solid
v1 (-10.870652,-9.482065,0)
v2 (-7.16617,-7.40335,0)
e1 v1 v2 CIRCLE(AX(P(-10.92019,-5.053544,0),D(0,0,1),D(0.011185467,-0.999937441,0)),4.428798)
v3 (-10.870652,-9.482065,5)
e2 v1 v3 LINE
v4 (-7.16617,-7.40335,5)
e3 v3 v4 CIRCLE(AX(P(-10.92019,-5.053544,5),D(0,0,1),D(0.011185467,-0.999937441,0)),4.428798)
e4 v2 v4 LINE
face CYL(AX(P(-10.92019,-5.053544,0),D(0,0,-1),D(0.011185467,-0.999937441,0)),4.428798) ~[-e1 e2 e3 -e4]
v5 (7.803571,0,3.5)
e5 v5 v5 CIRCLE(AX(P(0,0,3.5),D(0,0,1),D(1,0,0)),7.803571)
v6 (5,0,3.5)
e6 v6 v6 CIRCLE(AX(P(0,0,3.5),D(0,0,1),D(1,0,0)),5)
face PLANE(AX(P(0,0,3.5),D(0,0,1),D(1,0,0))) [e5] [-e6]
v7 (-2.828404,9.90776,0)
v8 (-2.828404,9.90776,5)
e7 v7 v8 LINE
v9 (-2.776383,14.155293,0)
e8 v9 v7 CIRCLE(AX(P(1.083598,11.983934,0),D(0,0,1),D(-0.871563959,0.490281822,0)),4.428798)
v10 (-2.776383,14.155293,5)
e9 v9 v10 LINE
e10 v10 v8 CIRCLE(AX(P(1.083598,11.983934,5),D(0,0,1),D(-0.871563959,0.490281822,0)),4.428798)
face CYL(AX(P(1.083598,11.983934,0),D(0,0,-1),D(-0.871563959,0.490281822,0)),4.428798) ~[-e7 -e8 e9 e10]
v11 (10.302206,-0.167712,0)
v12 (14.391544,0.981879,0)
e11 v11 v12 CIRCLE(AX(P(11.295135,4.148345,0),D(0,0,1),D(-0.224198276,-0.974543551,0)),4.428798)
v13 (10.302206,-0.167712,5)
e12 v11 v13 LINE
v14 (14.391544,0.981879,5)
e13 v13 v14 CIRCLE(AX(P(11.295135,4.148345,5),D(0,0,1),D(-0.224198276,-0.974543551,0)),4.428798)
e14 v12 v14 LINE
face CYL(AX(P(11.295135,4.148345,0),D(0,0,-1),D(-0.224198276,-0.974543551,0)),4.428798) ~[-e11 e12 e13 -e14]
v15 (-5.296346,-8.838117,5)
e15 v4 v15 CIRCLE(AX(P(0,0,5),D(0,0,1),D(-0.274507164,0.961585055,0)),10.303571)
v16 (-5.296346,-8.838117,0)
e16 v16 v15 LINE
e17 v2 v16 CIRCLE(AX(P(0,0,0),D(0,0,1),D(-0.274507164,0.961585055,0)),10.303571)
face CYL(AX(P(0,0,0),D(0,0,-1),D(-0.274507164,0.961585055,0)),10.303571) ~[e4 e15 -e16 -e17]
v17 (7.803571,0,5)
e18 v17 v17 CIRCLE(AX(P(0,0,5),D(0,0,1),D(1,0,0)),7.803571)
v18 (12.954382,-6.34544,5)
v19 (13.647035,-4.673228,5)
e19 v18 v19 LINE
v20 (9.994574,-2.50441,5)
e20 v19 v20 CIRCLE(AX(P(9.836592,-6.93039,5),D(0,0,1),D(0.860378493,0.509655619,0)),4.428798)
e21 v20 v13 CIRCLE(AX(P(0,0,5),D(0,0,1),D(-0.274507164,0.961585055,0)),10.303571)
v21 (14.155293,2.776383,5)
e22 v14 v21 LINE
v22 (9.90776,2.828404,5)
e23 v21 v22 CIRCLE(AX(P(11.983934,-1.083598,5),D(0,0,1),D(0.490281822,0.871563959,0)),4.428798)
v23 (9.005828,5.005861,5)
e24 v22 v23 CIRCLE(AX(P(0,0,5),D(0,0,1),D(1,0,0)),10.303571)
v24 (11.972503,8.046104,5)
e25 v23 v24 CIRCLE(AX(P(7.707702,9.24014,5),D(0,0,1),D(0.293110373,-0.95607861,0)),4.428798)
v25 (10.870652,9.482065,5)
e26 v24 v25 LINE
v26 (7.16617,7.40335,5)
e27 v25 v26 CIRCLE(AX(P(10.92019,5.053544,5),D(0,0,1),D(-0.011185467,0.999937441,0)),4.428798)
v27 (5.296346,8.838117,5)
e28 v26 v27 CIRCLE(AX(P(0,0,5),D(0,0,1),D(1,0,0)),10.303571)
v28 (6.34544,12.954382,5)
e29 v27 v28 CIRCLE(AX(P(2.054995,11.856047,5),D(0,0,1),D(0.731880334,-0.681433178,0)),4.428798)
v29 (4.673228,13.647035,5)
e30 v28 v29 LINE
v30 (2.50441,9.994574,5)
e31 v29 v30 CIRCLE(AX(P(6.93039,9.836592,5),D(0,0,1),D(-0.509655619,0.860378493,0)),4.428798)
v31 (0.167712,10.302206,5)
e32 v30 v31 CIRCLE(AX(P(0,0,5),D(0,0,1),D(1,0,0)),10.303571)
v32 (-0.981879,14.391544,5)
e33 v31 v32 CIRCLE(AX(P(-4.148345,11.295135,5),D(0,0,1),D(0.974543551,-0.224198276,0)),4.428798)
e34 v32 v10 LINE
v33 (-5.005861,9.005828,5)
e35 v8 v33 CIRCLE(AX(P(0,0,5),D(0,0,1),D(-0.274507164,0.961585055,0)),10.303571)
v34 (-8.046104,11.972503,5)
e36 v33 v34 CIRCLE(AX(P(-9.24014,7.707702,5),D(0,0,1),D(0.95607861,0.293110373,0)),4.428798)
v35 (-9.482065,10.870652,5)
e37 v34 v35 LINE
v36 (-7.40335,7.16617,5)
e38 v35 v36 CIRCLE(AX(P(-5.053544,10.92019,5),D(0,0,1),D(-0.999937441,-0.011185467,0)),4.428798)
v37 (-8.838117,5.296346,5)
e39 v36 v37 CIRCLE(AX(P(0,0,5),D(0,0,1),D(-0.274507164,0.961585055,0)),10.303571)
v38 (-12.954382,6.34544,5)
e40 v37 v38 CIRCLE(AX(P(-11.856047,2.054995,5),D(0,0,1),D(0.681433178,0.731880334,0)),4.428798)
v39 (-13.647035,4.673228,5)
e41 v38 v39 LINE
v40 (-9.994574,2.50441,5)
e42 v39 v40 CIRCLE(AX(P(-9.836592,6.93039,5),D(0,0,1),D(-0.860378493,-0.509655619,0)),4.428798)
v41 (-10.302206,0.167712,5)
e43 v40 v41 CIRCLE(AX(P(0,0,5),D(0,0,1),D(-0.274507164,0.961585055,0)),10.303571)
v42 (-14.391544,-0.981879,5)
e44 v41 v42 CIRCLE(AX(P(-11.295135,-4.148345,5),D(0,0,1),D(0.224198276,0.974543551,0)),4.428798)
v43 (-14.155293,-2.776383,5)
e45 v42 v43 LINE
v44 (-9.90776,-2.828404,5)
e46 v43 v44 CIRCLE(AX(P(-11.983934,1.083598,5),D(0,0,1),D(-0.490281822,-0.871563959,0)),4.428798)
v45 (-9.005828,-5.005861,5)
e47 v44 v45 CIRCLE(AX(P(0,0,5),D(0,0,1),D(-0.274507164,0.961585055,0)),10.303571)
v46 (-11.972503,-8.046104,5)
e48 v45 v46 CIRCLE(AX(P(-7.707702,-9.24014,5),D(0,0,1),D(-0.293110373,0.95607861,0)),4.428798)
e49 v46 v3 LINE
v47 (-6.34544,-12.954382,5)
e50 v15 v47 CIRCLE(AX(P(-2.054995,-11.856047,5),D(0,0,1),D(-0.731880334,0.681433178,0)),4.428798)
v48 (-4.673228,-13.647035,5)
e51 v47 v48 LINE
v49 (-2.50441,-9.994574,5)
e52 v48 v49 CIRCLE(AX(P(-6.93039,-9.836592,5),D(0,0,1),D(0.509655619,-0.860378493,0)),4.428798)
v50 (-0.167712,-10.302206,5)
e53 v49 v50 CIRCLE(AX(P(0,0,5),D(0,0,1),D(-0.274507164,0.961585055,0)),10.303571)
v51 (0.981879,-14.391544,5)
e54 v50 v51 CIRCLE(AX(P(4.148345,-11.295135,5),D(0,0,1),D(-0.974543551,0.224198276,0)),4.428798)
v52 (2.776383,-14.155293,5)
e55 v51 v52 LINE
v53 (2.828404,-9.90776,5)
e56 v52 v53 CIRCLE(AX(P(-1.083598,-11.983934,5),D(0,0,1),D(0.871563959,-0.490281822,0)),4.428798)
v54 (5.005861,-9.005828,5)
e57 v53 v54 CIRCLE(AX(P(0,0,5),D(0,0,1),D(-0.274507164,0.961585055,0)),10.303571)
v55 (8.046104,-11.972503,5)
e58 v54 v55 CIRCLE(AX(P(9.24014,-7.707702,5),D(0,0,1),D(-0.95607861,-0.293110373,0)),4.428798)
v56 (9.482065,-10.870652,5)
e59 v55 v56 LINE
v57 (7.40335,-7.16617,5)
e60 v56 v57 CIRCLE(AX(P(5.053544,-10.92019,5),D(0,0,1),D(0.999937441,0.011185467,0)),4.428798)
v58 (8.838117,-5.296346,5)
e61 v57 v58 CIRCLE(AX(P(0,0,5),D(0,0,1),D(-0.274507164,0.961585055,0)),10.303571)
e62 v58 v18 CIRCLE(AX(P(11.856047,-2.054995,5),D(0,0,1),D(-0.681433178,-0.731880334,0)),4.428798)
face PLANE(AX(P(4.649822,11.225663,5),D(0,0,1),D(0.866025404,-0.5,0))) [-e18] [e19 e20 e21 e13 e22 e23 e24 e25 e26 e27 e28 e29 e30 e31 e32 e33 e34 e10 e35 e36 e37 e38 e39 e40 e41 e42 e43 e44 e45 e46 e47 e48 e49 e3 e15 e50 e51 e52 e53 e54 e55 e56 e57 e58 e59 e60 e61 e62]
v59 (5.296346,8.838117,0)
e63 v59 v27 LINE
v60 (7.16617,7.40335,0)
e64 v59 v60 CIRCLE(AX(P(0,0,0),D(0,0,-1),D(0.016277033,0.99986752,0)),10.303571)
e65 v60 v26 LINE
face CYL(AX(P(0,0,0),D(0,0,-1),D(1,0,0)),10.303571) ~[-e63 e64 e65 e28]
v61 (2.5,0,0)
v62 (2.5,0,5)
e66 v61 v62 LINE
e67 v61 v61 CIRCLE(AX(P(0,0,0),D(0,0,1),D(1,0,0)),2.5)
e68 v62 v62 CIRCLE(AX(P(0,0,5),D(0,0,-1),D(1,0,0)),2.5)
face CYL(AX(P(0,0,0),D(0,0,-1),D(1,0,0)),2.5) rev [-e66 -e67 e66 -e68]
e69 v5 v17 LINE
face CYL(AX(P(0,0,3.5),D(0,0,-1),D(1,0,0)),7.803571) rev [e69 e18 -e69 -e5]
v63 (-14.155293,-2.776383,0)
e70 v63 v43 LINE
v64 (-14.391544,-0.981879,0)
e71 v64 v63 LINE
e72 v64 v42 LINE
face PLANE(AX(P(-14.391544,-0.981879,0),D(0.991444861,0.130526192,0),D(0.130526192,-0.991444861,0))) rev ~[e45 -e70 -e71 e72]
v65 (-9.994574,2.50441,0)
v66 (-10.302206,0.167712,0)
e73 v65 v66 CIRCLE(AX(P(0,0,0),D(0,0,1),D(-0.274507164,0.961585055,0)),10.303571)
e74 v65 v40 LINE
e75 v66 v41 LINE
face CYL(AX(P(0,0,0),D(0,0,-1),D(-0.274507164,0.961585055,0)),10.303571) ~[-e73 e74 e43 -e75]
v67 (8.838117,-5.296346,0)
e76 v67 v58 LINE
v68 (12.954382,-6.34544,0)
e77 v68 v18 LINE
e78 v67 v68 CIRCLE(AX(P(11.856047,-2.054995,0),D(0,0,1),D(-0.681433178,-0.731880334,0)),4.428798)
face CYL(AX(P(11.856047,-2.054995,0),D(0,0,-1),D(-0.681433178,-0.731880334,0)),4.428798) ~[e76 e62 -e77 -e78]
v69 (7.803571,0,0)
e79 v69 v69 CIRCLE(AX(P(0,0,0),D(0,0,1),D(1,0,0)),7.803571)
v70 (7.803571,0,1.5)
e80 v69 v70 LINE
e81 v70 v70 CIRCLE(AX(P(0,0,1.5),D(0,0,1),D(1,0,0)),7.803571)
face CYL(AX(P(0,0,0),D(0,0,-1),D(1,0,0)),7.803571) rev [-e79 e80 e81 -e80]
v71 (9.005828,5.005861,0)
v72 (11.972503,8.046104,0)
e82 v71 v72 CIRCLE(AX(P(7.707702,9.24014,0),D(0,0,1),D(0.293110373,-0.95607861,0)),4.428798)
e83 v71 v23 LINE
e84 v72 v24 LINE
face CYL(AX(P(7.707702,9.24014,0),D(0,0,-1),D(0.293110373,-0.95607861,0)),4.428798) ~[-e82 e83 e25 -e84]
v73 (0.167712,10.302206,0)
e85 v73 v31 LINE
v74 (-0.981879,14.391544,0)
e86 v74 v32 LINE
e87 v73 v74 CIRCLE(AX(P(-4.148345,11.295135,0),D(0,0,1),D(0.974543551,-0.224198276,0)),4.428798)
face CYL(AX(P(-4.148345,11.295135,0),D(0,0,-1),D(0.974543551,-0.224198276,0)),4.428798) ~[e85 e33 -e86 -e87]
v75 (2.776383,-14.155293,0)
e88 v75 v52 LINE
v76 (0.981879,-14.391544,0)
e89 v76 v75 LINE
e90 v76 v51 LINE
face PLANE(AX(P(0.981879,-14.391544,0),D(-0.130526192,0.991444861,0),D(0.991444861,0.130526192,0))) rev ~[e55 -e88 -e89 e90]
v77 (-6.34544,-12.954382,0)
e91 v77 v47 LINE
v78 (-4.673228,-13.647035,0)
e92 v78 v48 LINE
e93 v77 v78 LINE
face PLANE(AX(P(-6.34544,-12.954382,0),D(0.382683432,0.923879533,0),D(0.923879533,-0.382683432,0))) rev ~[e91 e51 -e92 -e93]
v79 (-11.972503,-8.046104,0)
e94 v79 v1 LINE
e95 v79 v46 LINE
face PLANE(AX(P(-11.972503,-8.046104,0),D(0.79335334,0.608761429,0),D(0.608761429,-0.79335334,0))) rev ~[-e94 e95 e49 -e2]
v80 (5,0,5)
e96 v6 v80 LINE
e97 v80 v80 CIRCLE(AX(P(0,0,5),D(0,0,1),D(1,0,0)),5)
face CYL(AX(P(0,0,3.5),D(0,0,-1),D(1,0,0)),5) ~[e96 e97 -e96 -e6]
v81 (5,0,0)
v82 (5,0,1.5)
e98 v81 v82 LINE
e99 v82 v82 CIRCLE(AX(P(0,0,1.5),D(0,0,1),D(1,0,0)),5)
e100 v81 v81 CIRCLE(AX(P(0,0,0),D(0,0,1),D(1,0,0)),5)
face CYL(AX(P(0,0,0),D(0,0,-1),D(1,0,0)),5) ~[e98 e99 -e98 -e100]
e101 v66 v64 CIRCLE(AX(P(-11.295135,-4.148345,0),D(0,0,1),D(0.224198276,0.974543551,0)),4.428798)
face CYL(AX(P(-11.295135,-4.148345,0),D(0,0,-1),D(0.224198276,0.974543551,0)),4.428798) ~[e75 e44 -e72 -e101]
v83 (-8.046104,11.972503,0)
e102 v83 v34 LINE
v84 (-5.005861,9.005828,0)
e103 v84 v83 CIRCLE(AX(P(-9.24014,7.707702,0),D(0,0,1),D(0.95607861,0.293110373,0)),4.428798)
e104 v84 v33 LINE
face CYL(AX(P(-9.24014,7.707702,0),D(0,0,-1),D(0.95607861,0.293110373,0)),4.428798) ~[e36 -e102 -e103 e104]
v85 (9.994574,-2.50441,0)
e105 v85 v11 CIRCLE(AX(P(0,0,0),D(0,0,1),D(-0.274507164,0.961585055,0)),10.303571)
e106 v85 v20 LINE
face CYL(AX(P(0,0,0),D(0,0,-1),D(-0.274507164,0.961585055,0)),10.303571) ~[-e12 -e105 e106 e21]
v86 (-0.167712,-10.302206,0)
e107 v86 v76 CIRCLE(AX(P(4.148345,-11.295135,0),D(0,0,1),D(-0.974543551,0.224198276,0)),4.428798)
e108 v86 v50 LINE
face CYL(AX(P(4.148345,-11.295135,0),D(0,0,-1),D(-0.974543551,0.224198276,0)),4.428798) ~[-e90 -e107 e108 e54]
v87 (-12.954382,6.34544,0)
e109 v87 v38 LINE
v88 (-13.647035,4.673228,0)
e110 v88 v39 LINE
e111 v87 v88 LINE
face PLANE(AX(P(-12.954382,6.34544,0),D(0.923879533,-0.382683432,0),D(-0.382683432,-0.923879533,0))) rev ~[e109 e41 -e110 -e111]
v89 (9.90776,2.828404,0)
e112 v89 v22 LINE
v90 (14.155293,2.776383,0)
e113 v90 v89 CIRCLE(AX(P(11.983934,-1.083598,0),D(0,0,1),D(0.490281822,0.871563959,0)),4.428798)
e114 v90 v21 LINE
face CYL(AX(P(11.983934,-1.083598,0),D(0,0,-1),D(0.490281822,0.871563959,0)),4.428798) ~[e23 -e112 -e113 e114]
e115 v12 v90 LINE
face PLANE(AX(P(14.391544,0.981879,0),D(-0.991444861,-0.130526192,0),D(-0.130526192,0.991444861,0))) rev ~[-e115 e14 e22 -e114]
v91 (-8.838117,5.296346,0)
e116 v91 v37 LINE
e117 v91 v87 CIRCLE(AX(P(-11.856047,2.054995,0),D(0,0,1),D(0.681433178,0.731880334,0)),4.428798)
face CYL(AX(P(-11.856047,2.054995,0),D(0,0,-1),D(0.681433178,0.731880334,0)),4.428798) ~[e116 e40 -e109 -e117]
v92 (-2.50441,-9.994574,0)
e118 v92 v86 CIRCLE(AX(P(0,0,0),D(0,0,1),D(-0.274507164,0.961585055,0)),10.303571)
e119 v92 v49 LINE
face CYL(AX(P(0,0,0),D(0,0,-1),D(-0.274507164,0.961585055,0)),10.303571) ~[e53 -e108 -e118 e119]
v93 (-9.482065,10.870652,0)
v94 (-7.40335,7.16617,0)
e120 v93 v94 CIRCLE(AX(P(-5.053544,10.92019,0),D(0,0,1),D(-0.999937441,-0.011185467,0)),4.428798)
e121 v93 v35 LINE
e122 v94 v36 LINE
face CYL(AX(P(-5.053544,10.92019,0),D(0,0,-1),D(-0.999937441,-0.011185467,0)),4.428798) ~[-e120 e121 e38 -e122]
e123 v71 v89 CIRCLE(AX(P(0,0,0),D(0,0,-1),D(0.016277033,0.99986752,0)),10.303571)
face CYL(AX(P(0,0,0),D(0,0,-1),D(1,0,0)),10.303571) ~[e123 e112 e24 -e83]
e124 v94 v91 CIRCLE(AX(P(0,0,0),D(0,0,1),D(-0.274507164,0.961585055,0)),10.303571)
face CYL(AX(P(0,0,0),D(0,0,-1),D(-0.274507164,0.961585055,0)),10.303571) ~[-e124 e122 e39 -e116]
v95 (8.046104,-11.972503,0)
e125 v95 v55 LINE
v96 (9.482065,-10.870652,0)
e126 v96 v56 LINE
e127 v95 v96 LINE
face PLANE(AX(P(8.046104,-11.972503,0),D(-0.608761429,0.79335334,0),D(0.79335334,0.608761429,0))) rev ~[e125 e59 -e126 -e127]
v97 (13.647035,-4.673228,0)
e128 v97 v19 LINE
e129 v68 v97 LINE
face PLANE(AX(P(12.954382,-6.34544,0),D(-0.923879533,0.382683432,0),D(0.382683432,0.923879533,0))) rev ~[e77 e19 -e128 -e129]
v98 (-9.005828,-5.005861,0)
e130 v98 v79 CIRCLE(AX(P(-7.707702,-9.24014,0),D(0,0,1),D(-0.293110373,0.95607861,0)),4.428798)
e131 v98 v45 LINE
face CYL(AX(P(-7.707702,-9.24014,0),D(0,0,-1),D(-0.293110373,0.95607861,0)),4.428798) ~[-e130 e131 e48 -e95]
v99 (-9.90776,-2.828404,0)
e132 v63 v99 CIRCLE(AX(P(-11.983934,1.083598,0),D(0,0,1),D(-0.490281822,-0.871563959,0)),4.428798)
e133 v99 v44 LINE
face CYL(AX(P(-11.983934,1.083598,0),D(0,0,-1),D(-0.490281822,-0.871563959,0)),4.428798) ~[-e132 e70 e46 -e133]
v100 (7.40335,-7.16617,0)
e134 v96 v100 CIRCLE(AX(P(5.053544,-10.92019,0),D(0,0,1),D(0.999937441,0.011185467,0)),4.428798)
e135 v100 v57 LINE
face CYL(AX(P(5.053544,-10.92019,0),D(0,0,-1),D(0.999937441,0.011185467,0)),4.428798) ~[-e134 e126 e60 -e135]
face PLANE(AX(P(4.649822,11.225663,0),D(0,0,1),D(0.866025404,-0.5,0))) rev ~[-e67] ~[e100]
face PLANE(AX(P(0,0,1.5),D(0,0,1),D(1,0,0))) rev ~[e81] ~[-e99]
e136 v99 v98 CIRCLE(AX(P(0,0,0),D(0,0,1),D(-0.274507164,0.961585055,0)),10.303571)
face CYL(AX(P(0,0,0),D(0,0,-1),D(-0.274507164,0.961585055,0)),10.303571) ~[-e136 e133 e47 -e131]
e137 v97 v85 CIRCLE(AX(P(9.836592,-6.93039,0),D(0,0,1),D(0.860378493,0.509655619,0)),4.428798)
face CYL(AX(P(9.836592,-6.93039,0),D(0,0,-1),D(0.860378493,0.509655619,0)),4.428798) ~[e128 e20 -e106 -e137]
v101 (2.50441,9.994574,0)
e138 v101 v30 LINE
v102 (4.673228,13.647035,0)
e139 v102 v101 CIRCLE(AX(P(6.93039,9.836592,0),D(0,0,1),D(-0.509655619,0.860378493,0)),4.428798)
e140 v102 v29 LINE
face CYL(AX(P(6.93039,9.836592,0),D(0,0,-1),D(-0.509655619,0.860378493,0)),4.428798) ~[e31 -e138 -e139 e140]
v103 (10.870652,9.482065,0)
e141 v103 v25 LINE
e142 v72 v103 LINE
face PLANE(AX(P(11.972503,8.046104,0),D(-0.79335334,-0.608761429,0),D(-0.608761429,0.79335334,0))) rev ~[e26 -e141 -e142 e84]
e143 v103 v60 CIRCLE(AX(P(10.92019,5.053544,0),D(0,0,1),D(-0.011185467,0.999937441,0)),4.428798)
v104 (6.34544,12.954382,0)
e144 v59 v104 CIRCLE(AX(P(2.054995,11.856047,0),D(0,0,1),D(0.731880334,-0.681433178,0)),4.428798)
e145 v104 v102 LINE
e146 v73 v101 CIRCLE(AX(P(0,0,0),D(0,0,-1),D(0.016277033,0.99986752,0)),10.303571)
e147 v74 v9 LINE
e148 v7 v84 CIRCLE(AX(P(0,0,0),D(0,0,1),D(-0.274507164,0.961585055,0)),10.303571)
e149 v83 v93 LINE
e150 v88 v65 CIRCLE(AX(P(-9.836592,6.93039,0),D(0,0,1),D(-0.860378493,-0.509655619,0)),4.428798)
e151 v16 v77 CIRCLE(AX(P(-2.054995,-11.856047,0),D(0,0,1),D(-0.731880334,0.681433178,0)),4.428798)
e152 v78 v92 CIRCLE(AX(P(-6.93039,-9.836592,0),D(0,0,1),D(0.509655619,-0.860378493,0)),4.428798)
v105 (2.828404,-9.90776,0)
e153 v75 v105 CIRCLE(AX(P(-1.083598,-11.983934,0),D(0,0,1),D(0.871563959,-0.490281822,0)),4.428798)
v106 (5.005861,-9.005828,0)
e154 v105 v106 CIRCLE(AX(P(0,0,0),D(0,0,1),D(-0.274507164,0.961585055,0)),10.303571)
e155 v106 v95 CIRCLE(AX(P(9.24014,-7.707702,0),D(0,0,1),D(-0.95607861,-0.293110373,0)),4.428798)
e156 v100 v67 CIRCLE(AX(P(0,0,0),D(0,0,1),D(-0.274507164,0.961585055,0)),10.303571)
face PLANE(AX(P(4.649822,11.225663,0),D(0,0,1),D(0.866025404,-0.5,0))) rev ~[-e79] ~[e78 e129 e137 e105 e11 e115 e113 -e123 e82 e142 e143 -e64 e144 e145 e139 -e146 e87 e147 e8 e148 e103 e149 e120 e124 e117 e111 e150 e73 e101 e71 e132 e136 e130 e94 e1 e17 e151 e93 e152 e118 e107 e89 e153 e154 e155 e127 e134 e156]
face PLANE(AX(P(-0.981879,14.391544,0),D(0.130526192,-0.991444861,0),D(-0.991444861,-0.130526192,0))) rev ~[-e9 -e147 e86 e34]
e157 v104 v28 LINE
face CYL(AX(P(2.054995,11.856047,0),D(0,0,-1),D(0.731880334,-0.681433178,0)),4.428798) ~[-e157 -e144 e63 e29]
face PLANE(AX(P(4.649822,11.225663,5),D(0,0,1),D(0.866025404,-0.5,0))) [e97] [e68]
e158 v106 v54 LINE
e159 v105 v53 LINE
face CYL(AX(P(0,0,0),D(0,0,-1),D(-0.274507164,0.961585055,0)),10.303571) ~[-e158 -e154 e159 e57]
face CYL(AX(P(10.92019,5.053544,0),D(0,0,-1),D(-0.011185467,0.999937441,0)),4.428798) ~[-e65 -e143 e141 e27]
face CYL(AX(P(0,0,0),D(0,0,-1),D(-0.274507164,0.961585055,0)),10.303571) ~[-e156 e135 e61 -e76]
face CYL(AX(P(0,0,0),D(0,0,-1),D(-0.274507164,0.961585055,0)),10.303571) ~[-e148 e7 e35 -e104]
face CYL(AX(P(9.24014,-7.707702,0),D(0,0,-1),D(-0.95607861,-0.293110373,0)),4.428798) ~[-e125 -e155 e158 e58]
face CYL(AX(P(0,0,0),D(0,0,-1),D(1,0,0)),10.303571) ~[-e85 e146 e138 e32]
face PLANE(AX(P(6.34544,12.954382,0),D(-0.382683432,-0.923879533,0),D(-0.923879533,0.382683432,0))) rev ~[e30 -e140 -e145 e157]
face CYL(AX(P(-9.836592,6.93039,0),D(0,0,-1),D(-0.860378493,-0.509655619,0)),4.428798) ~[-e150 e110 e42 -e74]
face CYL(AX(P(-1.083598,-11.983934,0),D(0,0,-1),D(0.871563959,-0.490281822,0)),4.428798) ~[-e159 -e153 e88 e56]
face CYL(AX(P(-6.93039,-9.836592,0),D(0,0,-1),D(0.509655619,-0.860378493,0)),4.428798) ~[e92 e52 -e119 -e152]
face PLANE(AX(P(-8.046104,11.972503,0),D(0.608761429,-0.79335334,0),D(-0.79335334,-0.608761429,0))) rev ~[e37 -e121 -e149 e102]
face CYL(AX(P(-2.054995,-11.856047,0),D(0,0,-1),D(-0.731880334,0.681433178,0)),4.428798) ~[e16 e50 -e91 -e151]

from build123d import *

# Parameters (mm, degrees)
F2_R     = 2.5
F4_DEPTH = 5
F5_COUNT = 12
F5_ANGLE = 330
F6_R     = 7.8035714286
F6_R_2   = 5
F7_DEPTH = 1.5
F8_START = 3.5
F8_DEPTH = 1.5


# Not quite as in the source:
# - a feature names something its author has since deleted; it is built from what else it names


with BuildPart() as f4:
    # F2 (on Top) → F4 (new body)
    with BuildSketch(Plane.XY):
        with BuildLine():
            ThreePointArc((-2.828404167, 9.9077602944), (-1.3448859448, 10.2154229467), (0.1677115736, 10.3022064147))
            ThreePointArc((0.1677115736, 10.3022064147), (0.1151870939, 12.4936954813), (-0.981879075, 14.3915439923))
            Line((-0.981879075, 14.3915439923), (-2.7763833168, 14.1552930269))
            ThreePointArc((-2.7763833168, 14.1552930269), (-3.3448685232, 12.0381705175), (-2.828404167, 9.9077602944))
        make_face()
        with BuildLine():
            ThreePointArc((-2.828404167, 9.9077602944), (-6.2056796493, -8.2251519301), (10.3035714286, 0))
            ThreePointArc((10.3035714286, 0), (7.3447808804, 7.2261869615), (0.1677115736, 10.3022064147))
            ThreePointArc((0.1677115736, 10.3022064147), (-1.3448859448, 10.2154229467), (-2.828404167, 9.9077602944))
        make_face()
        Circle(F2_R, mode=Mode.SUBTRACT)
    extrude(amount=F4_DEPTH)

    # F5: F4 ×12 about axis
    f5_axis = Axis((0, 0, 30.7848658413), (0, 0, 1))


with BuildPart() as f4_1:
    add(f4.part)
    for i in range(1, F5_COUNT):
        add(f4.part.rotate(f5_axis, i * F5_ANGLE / (F5_COUNT - 1)))

    # F6 (on Top) → F7 (cut)
    with BuildSketch(Plane.XY):
        Circle(F6_R)
        Circle(F6_R_2, mode=Mode.SUBTRACT)
    extrude(amount=F7_DEPTH, mode=Mode.SUBTRACT)

    # F6 (on Top) → F8 (cut)
    with BuildSketch(Plane.XY.offset(F8_START)):
        Circle(F6_R)
        Circle(F6_R_2, mode=Mode.SUBTRACT)
    extrude(amount=F8_DEPTH, mode=Mode.SUBTRACT)


solid = f4_1.part
